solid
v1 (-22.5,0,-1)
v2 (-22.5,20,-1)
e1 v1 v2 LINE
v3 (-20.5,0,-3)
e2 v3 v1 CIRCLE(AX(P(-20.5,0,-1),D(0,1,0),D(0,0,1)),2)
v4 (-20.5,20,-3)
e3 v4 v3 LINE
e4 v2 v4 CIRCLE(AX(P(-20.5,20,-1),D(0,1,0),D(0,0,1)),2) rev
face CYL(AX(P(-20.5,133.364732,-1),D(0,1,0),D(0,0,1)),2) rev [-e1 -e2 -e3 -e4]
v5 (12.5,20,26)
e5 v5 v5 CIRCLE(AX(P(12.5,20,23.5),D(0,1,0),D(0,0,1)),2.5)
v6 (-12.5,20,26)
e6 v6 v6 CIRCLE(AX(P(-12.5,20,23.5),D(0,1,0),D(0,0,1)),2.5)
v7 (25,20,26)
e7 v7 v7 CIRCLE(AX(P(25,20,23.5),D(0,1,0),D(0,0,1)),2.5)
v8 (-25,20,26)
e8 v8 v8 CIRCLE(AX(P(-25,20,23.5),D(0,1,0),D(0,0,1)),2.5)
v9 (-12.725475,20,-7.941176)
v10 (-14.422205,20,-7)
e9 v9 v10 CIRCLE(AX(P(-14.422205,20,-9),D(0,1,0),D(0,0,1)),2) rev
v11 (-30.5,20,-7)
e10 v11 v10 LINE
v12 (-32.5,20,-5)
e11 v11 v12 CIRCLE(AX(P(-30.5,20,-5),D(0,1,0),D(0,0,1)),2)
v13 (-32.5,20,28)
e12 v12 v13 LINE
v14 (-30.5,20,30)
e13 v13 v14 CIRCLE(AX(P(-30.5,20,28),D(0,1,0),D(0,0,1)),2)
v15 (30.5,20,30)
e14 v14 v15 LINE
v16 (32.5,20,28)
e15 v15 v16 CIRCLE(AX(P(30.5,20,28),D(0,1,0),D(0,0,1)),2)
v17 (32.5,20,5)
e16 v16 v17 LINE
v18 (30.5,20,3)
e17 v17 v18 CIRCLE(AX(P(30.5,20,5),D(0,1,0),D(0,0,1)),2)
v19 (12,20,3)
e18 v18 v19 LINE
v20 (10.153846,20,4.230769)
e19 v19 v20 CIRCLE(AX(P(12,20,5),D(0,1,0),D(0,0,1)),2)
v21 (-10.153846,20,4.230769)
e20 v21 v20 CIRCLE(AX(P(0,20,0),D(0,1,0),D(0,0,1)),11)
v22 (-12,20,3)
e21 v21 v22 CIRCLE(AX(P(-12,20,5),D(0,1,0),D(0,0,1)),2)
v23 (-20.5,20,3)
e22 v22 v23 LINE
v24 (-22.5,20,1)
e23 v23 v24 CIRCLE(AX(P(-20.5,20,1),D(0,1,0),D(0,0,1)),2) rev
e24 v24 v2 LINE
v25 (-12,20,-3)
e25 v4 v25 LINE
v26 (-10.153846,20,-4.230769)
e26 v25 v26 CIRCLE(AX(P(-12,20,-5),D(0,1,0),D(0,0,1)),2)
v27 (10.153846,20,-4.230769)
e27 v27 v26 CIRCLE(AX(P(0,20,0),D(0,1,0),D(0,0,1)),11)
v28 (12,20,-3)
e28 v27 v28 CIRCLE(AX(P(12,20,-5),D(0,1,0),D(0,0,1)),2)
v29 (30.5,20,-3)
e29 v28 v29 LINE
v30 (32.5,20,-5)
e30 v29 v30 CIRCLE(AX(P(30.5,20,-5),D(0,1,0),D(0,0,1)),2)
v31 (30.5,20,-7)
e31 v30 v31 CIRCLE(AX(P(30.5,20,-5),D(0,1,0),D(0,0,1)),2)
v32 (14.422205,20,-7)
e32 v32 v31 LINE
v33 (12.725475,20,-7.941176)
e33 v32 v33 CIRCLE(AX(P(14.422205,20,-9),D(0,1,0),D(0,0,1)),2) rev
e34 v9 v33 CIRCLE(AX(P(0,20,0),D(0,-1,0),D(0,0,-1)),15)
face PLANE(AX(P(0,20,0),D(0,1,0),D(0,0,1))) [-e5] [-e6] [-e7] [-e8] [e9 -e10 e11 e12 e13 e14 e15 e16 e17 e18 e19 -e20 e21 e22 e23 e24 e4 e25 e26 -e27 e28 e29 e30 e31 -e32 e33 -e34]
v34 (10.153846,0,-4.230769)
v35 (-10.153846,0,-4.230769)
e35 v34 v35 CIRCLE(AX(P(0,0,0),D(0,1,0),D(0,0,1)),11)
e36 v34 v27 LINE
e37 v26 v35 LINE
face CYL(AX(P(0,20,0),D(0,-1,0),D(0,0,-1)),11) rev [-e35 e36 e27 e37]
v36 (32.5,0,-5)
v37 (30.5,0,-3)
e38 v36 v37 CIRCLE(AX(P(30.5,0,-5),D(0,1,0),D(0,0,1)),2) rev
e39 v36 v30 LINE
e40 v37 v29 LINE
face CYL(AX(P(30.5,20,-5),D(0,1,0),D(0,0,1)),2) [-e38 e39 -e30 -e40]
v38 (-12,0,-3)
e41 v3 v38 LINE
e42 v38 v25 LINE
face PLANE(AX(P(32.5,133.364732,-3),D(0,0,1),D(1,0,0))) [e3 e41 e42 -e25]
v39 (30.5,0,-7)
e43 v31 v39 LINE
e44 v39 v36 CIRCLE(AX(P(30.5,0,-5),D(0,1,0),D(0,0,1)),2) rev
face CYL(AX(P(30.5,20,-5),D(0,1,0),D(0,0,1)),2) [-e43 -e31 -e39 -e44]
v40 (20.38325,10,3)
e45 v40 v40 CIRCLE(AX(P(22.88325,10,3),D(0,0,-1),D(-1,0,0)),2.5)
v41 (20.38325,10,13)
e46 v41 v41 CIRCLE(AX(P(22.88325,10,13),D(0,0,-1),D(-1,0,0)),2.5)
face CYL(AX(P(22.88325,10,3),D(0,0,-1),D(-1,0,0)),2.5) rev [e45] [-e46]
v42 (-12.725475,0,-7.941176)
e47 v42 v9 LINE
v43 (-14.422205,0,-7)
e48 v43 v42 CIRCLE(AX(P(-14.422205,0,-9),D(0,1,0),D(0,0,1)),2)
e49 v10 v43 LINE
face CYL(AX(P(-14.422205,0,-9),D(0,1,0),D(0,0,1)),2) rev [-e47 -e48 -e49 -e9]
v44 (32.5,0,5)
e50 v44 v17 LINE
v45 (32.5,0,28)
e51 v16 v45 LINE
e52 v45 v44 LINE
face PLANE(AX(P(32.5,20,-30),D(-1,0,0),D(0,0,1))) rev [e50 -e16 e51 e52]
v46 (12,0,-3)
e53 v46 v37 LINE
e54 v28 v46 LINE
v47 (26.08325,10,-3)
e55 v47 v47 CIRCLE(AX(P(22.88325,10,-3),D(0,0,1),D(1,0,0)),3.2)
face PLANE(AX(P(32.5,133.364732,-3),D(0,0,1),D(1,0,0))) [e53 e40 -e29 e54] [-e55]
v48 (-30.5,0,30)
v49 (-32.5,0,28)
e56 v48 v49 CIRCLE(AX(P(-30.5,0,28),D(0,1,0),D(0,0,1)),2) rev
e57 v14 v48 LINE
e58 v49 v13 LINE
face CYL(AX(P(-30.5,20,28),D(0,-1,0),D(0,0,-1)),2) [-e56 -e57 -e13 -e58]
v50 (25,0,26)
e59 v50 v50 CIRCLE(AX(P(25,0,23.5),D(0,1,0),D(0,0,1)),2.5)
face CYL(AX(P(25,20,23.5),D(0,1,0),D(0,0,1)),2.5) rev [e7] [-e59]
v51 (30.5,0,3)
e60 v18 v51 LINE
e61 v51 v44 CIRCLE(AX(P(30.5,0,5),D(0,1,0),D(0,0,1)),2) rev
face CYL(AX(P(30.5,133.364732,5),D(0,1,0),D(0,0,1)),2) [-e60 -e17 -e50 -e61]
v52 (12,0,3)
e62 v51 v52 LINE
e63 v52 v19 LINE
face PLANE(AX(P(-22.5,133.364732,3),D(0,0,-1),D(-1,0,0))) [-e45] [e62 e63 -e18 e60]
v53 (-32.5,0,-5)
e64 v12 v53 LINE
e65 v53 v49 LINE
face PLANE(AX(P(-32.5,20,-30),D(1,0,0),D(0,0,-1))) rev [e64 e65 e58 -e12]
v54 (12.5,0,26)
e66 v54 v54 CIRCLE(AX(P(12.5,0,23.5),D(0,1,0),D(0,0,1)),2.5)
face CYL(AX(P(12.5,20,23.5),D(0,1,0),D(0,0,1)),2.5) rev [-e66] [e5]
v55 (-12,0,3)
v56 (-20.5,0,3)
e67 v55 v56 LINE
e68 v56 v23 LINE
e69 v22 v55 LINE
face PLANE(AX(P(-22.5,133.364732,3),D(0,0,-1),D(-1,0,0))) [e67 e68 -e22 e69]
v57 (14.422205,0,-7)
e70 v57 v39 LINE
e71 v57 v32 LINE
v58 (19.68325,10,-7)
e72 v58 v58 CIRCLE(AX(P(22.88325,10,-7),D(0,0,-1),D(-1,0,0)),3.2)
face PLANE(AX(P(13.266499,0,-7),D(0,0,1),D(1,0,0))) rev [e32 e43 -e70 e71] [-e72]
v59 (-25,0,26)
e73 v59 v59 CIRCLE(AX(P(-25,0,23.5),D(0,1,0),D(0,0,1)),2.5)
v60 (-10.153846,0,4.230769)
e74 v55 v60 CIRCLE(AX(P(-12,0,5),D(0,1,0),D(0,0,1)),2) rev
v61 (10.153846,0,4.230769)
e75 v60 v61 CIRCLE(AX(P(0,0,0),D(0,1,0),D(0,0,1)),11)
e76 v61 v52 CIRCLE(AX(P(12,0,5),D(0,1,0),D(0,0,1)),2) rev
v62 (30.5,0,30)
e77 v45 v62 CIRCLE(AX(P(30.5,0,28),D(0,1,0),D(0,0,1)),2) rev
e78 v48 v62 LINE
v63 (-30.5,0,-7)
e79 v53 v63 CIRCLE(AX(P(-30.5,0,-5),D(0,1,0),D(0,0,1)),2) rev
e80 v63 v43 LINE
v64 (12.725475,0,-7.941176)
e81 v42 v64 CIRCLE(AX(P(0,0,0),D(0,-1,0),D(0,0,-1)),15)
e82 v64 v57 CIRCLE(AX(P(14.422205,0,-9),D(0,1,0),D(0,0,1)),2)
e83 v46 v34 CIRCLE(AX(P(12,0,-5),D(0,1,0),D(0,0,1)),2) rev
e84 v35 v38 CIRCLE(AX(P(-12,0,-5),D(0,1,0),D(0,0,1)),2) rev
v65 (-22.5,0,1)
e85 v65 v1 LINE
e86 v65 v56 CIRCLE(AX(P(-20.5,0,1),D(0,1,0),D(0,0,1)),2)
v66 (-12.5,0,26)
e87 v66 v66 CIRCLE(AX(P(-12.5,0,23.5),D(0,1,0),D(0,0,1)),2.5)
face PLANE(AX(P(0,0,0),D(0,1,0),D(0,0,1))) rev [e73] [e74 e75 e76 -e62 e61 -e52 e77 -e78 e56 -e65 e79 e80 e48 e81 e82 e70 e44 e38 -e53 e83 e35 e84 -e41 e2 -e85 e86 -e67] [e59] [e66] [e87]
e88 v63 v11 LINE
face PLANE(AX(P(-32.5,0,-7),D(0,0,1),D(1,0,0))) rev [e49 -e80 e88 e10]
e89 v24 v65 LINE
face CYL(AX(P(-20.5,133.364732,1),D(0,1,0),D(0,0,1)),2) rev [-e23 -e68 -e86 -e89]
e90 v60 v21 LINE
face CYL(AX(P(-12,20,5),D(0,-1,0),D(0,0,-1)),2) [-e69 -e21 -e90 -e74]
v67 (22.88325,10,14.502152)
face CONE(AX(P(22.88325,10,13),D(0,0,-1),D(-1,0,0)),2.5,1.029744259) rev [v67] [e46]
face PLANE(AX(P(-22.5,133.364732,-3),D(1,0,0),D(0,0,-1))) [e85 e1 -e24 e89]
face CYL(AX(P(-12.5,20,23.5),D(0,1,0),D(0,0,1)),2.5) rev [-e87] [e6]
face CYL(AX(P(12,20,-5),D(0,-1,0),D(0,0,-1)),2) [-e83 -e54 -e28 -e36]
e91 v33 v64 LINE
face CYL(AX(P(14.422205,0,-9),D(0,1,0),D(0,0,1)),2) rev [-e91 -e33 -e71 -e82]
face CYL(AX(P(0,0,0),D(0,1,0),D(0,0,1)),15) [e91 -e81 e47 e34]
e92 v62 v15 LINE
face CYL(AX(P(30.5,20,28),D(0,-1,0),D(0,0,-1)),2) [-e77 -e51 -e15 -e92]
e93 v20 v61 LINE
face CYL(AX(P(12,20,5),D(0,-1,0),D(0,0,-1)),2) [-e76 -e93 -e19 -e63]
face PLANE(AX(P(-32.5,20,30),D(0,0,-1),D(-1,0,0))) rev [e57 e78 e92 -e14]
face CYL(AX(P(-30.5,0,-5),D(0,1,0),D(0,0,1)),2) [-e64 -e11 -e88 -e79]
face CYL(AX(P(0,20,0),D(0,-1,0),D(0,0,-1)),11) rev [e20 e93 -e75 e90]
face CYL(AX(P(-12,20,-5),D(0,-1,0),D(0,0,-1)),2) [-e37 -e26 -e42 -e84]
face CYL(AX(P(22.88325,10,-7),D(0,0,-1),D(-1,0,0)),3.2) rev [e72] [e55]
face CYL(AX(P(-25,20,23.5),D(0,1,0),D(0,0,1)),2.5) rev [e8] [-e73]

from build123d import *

# Parameters (mm, degrees)
SKETCH1_W                = 65
SKETCH1_H                = 60
SKETCH1_R                = 11
BOSS_EXTRUDE1_DEPTH      = 20
CUT_EXTRUDE1_DEPTH       = 49.541219597
CUT_EXTRUDE1_DEPTH_BACK  = 49.541219597
M6_TAPPED_HOLE2_D        = 5
LPATTERN2_COUNT          = 2
LPATTERN2_PITCH          = 12.5
MIRROR2_COPY_1_D         = 5
CUT_EXTRUDE2_DEPTH       = 49.541219597
M6_CLEARANCE_HOLE1_D     = 6.4
M6_CLEARANCE_HOLE1_DEPTH = 4
M6_TAPPED_HOLE1_D        = 5
M6_TAPPED_HOLE1_DEPTH    = 10
M6_TAPPED_HOLE1_TIP      = 1.502151548
FILLET1_R                = 2


with BuildPart() as part:
    # Sketch1 → Boss-Extrude1 (new body)
    with BuildSketch(Plane(origin=(0, 0, 0), x_dir=(1, 0, 0), z_dir=(0, 1, 0))):
        Rectangle(SKETCH1_W, SKETCH1_H)
        with Locations(Location((0, 0, 0), (0, 0, 270))):
            Circle(SKETCH1_R, mode=Mode.SUBTRACT)
    extrude(amount=BOSS_EXTRUDE1_DEPTH)

    # Sketch2 → Cut-Extrude1 (cut, two sides: drawn at the far end of the back side and taken through both)
    with BuildSketch(Plane(origin=(0, 20, 0), x_dir=(1, 0, 0), z_dir=(0, 1, 0)).offset(-CUT_EXTRUDE1_DEPTH_BACK)):
        Polygon((188.294375749, 3), (32.5, 3), (-22.5, 3), (-22.5, -3), (32.5, -3), (188.294375749, -3), (499.883127247, -3), (499.883127247, 3), align=None)
    extrude(amount=CUT_EXTRUDE1_DEPTH + CUT_EXTRUDE1_DEPTH_BACK, mode=Mode.SUBTRACT)

    # M6 Tapped Hole2 (through all)
    with Locations(Plane(origin=(0, 20, 0), x_dir=(1, 0, 0), z_dir=(0, 1, 0))):
        with Locations((12.5, -23.5)):
            m6_tapped_hole2 = Hole(M6_TAPPED_HOLE2_D / 2)

    # LPattern2: M6 Tapped Hole2 ×2
    with Locations(*[(i * LPATTERN2_PITCH, 0, 0) for i in range(1, LPATTERN2_COUNT)]):
        add(m6_tapped_hole2, mode=Mode.SUBTRACT)

    # Mirror2: M6 Tapped Hole2 across plane
    add(m6_tapped_hole2.mirror(Plane(origin=(0, 0, 0), x_dir=(0, 0, 1), z_dir=(1, 0, 0))), mode=Mode.SUBTRACT)

    # Mirror2 copy 1 (through all)
    with Locations(Plane(origin=(-12.5, 20, 0), x_dir=(-1, 0, 0), z_dir=(0, 1, 0))):
        with Locations((12.5, 23.5)):
            Hole(MIRROR2_COPY_1_D / 2)

    # Sketch6 → Cut-Extrude2 (cut, through all)
    with BuildSketch(Plane(origin=(0, 20, 0), x_dir=(1, 0, 0), z_dir=(0, 1, 0))):
        with BuildLine():
            Line((-32.5, 7), (-13.266499161, 7))
            ThreePointArc((-13.266499161, 7), (0, 15), (13.266499161, 7))
            Line((13.266499161, 7), (32.5, 7))
            Line((32.5, 7), (32.5, 30))
            Line((32.5, 30), (-32.5, 30))
            Line((-32.5, 30), (-32.5, 7))
        make_face()
    extrude(amount=-CUT_EXTRUDE2_DEPTH, mode=Mode.SUBTRACT)

    # M6 Clearance Hole1
    with Locations(Plane(origin=(0, 0, -7), x_dir=(-1, 0, 0), z_dir=(0, 0, -1))):
        with Locations((-22.883249581, 10)):
            Hole(M6_CLEARANCE_HOLE1_D / 2, depth=M6_CLEARANCE_HOLE1_DEPTH)

    # M6 Tapped Hole1
    with Locations(Plane(origin=(0, 0, 3), x_dir=(-1, 0, 0), z_dir=(0, 0, -1))):
        with Locations((-22.883249581, 10)):
            Hole(M6_TAPPED_HOLE1_D / 2, depth=M6_TAPPED_HOLE1_DEPTH)
            with Locations((0, 0, -(M6_TAPPED_HOLE1_DEPTH + M6_TAPPED_HOLE1_TIP / 2))):  # 118° drill point
                Cone(0, M6_TAPPED_HOLE1_D / 2, M6_TAPPED_HOLE1_TIP, mode=Mode.SUBTRACT)

    # Fillet1
    fillet1_edges = [part.edges().sort_by_distance(p)[0] for p in [
        (-10.583005244, 10, 3),
        (10.583005244, 10, 3),
        (10.583005244, 10, -3),
        (-10.583005244, 10, -3),
        (-22.5, 10, 3),
        (-22.5, 10, -3),
        (32.5, 10, 3),
        (32.5, 10, -3),
        (-32.5, 10, -7),
        (32.5, 10, -7),
        (13.266499161, 10, -7),
        (-13.266499161, 10, -7),
        (32.5, 10, 30),
        (-32.5, 10, 30),
    ]]
    fillet(fillet1_edges, radius=FILLET1_R - 0.0001)  # a hair under: the kernel refuses the full size


solid = part.part
